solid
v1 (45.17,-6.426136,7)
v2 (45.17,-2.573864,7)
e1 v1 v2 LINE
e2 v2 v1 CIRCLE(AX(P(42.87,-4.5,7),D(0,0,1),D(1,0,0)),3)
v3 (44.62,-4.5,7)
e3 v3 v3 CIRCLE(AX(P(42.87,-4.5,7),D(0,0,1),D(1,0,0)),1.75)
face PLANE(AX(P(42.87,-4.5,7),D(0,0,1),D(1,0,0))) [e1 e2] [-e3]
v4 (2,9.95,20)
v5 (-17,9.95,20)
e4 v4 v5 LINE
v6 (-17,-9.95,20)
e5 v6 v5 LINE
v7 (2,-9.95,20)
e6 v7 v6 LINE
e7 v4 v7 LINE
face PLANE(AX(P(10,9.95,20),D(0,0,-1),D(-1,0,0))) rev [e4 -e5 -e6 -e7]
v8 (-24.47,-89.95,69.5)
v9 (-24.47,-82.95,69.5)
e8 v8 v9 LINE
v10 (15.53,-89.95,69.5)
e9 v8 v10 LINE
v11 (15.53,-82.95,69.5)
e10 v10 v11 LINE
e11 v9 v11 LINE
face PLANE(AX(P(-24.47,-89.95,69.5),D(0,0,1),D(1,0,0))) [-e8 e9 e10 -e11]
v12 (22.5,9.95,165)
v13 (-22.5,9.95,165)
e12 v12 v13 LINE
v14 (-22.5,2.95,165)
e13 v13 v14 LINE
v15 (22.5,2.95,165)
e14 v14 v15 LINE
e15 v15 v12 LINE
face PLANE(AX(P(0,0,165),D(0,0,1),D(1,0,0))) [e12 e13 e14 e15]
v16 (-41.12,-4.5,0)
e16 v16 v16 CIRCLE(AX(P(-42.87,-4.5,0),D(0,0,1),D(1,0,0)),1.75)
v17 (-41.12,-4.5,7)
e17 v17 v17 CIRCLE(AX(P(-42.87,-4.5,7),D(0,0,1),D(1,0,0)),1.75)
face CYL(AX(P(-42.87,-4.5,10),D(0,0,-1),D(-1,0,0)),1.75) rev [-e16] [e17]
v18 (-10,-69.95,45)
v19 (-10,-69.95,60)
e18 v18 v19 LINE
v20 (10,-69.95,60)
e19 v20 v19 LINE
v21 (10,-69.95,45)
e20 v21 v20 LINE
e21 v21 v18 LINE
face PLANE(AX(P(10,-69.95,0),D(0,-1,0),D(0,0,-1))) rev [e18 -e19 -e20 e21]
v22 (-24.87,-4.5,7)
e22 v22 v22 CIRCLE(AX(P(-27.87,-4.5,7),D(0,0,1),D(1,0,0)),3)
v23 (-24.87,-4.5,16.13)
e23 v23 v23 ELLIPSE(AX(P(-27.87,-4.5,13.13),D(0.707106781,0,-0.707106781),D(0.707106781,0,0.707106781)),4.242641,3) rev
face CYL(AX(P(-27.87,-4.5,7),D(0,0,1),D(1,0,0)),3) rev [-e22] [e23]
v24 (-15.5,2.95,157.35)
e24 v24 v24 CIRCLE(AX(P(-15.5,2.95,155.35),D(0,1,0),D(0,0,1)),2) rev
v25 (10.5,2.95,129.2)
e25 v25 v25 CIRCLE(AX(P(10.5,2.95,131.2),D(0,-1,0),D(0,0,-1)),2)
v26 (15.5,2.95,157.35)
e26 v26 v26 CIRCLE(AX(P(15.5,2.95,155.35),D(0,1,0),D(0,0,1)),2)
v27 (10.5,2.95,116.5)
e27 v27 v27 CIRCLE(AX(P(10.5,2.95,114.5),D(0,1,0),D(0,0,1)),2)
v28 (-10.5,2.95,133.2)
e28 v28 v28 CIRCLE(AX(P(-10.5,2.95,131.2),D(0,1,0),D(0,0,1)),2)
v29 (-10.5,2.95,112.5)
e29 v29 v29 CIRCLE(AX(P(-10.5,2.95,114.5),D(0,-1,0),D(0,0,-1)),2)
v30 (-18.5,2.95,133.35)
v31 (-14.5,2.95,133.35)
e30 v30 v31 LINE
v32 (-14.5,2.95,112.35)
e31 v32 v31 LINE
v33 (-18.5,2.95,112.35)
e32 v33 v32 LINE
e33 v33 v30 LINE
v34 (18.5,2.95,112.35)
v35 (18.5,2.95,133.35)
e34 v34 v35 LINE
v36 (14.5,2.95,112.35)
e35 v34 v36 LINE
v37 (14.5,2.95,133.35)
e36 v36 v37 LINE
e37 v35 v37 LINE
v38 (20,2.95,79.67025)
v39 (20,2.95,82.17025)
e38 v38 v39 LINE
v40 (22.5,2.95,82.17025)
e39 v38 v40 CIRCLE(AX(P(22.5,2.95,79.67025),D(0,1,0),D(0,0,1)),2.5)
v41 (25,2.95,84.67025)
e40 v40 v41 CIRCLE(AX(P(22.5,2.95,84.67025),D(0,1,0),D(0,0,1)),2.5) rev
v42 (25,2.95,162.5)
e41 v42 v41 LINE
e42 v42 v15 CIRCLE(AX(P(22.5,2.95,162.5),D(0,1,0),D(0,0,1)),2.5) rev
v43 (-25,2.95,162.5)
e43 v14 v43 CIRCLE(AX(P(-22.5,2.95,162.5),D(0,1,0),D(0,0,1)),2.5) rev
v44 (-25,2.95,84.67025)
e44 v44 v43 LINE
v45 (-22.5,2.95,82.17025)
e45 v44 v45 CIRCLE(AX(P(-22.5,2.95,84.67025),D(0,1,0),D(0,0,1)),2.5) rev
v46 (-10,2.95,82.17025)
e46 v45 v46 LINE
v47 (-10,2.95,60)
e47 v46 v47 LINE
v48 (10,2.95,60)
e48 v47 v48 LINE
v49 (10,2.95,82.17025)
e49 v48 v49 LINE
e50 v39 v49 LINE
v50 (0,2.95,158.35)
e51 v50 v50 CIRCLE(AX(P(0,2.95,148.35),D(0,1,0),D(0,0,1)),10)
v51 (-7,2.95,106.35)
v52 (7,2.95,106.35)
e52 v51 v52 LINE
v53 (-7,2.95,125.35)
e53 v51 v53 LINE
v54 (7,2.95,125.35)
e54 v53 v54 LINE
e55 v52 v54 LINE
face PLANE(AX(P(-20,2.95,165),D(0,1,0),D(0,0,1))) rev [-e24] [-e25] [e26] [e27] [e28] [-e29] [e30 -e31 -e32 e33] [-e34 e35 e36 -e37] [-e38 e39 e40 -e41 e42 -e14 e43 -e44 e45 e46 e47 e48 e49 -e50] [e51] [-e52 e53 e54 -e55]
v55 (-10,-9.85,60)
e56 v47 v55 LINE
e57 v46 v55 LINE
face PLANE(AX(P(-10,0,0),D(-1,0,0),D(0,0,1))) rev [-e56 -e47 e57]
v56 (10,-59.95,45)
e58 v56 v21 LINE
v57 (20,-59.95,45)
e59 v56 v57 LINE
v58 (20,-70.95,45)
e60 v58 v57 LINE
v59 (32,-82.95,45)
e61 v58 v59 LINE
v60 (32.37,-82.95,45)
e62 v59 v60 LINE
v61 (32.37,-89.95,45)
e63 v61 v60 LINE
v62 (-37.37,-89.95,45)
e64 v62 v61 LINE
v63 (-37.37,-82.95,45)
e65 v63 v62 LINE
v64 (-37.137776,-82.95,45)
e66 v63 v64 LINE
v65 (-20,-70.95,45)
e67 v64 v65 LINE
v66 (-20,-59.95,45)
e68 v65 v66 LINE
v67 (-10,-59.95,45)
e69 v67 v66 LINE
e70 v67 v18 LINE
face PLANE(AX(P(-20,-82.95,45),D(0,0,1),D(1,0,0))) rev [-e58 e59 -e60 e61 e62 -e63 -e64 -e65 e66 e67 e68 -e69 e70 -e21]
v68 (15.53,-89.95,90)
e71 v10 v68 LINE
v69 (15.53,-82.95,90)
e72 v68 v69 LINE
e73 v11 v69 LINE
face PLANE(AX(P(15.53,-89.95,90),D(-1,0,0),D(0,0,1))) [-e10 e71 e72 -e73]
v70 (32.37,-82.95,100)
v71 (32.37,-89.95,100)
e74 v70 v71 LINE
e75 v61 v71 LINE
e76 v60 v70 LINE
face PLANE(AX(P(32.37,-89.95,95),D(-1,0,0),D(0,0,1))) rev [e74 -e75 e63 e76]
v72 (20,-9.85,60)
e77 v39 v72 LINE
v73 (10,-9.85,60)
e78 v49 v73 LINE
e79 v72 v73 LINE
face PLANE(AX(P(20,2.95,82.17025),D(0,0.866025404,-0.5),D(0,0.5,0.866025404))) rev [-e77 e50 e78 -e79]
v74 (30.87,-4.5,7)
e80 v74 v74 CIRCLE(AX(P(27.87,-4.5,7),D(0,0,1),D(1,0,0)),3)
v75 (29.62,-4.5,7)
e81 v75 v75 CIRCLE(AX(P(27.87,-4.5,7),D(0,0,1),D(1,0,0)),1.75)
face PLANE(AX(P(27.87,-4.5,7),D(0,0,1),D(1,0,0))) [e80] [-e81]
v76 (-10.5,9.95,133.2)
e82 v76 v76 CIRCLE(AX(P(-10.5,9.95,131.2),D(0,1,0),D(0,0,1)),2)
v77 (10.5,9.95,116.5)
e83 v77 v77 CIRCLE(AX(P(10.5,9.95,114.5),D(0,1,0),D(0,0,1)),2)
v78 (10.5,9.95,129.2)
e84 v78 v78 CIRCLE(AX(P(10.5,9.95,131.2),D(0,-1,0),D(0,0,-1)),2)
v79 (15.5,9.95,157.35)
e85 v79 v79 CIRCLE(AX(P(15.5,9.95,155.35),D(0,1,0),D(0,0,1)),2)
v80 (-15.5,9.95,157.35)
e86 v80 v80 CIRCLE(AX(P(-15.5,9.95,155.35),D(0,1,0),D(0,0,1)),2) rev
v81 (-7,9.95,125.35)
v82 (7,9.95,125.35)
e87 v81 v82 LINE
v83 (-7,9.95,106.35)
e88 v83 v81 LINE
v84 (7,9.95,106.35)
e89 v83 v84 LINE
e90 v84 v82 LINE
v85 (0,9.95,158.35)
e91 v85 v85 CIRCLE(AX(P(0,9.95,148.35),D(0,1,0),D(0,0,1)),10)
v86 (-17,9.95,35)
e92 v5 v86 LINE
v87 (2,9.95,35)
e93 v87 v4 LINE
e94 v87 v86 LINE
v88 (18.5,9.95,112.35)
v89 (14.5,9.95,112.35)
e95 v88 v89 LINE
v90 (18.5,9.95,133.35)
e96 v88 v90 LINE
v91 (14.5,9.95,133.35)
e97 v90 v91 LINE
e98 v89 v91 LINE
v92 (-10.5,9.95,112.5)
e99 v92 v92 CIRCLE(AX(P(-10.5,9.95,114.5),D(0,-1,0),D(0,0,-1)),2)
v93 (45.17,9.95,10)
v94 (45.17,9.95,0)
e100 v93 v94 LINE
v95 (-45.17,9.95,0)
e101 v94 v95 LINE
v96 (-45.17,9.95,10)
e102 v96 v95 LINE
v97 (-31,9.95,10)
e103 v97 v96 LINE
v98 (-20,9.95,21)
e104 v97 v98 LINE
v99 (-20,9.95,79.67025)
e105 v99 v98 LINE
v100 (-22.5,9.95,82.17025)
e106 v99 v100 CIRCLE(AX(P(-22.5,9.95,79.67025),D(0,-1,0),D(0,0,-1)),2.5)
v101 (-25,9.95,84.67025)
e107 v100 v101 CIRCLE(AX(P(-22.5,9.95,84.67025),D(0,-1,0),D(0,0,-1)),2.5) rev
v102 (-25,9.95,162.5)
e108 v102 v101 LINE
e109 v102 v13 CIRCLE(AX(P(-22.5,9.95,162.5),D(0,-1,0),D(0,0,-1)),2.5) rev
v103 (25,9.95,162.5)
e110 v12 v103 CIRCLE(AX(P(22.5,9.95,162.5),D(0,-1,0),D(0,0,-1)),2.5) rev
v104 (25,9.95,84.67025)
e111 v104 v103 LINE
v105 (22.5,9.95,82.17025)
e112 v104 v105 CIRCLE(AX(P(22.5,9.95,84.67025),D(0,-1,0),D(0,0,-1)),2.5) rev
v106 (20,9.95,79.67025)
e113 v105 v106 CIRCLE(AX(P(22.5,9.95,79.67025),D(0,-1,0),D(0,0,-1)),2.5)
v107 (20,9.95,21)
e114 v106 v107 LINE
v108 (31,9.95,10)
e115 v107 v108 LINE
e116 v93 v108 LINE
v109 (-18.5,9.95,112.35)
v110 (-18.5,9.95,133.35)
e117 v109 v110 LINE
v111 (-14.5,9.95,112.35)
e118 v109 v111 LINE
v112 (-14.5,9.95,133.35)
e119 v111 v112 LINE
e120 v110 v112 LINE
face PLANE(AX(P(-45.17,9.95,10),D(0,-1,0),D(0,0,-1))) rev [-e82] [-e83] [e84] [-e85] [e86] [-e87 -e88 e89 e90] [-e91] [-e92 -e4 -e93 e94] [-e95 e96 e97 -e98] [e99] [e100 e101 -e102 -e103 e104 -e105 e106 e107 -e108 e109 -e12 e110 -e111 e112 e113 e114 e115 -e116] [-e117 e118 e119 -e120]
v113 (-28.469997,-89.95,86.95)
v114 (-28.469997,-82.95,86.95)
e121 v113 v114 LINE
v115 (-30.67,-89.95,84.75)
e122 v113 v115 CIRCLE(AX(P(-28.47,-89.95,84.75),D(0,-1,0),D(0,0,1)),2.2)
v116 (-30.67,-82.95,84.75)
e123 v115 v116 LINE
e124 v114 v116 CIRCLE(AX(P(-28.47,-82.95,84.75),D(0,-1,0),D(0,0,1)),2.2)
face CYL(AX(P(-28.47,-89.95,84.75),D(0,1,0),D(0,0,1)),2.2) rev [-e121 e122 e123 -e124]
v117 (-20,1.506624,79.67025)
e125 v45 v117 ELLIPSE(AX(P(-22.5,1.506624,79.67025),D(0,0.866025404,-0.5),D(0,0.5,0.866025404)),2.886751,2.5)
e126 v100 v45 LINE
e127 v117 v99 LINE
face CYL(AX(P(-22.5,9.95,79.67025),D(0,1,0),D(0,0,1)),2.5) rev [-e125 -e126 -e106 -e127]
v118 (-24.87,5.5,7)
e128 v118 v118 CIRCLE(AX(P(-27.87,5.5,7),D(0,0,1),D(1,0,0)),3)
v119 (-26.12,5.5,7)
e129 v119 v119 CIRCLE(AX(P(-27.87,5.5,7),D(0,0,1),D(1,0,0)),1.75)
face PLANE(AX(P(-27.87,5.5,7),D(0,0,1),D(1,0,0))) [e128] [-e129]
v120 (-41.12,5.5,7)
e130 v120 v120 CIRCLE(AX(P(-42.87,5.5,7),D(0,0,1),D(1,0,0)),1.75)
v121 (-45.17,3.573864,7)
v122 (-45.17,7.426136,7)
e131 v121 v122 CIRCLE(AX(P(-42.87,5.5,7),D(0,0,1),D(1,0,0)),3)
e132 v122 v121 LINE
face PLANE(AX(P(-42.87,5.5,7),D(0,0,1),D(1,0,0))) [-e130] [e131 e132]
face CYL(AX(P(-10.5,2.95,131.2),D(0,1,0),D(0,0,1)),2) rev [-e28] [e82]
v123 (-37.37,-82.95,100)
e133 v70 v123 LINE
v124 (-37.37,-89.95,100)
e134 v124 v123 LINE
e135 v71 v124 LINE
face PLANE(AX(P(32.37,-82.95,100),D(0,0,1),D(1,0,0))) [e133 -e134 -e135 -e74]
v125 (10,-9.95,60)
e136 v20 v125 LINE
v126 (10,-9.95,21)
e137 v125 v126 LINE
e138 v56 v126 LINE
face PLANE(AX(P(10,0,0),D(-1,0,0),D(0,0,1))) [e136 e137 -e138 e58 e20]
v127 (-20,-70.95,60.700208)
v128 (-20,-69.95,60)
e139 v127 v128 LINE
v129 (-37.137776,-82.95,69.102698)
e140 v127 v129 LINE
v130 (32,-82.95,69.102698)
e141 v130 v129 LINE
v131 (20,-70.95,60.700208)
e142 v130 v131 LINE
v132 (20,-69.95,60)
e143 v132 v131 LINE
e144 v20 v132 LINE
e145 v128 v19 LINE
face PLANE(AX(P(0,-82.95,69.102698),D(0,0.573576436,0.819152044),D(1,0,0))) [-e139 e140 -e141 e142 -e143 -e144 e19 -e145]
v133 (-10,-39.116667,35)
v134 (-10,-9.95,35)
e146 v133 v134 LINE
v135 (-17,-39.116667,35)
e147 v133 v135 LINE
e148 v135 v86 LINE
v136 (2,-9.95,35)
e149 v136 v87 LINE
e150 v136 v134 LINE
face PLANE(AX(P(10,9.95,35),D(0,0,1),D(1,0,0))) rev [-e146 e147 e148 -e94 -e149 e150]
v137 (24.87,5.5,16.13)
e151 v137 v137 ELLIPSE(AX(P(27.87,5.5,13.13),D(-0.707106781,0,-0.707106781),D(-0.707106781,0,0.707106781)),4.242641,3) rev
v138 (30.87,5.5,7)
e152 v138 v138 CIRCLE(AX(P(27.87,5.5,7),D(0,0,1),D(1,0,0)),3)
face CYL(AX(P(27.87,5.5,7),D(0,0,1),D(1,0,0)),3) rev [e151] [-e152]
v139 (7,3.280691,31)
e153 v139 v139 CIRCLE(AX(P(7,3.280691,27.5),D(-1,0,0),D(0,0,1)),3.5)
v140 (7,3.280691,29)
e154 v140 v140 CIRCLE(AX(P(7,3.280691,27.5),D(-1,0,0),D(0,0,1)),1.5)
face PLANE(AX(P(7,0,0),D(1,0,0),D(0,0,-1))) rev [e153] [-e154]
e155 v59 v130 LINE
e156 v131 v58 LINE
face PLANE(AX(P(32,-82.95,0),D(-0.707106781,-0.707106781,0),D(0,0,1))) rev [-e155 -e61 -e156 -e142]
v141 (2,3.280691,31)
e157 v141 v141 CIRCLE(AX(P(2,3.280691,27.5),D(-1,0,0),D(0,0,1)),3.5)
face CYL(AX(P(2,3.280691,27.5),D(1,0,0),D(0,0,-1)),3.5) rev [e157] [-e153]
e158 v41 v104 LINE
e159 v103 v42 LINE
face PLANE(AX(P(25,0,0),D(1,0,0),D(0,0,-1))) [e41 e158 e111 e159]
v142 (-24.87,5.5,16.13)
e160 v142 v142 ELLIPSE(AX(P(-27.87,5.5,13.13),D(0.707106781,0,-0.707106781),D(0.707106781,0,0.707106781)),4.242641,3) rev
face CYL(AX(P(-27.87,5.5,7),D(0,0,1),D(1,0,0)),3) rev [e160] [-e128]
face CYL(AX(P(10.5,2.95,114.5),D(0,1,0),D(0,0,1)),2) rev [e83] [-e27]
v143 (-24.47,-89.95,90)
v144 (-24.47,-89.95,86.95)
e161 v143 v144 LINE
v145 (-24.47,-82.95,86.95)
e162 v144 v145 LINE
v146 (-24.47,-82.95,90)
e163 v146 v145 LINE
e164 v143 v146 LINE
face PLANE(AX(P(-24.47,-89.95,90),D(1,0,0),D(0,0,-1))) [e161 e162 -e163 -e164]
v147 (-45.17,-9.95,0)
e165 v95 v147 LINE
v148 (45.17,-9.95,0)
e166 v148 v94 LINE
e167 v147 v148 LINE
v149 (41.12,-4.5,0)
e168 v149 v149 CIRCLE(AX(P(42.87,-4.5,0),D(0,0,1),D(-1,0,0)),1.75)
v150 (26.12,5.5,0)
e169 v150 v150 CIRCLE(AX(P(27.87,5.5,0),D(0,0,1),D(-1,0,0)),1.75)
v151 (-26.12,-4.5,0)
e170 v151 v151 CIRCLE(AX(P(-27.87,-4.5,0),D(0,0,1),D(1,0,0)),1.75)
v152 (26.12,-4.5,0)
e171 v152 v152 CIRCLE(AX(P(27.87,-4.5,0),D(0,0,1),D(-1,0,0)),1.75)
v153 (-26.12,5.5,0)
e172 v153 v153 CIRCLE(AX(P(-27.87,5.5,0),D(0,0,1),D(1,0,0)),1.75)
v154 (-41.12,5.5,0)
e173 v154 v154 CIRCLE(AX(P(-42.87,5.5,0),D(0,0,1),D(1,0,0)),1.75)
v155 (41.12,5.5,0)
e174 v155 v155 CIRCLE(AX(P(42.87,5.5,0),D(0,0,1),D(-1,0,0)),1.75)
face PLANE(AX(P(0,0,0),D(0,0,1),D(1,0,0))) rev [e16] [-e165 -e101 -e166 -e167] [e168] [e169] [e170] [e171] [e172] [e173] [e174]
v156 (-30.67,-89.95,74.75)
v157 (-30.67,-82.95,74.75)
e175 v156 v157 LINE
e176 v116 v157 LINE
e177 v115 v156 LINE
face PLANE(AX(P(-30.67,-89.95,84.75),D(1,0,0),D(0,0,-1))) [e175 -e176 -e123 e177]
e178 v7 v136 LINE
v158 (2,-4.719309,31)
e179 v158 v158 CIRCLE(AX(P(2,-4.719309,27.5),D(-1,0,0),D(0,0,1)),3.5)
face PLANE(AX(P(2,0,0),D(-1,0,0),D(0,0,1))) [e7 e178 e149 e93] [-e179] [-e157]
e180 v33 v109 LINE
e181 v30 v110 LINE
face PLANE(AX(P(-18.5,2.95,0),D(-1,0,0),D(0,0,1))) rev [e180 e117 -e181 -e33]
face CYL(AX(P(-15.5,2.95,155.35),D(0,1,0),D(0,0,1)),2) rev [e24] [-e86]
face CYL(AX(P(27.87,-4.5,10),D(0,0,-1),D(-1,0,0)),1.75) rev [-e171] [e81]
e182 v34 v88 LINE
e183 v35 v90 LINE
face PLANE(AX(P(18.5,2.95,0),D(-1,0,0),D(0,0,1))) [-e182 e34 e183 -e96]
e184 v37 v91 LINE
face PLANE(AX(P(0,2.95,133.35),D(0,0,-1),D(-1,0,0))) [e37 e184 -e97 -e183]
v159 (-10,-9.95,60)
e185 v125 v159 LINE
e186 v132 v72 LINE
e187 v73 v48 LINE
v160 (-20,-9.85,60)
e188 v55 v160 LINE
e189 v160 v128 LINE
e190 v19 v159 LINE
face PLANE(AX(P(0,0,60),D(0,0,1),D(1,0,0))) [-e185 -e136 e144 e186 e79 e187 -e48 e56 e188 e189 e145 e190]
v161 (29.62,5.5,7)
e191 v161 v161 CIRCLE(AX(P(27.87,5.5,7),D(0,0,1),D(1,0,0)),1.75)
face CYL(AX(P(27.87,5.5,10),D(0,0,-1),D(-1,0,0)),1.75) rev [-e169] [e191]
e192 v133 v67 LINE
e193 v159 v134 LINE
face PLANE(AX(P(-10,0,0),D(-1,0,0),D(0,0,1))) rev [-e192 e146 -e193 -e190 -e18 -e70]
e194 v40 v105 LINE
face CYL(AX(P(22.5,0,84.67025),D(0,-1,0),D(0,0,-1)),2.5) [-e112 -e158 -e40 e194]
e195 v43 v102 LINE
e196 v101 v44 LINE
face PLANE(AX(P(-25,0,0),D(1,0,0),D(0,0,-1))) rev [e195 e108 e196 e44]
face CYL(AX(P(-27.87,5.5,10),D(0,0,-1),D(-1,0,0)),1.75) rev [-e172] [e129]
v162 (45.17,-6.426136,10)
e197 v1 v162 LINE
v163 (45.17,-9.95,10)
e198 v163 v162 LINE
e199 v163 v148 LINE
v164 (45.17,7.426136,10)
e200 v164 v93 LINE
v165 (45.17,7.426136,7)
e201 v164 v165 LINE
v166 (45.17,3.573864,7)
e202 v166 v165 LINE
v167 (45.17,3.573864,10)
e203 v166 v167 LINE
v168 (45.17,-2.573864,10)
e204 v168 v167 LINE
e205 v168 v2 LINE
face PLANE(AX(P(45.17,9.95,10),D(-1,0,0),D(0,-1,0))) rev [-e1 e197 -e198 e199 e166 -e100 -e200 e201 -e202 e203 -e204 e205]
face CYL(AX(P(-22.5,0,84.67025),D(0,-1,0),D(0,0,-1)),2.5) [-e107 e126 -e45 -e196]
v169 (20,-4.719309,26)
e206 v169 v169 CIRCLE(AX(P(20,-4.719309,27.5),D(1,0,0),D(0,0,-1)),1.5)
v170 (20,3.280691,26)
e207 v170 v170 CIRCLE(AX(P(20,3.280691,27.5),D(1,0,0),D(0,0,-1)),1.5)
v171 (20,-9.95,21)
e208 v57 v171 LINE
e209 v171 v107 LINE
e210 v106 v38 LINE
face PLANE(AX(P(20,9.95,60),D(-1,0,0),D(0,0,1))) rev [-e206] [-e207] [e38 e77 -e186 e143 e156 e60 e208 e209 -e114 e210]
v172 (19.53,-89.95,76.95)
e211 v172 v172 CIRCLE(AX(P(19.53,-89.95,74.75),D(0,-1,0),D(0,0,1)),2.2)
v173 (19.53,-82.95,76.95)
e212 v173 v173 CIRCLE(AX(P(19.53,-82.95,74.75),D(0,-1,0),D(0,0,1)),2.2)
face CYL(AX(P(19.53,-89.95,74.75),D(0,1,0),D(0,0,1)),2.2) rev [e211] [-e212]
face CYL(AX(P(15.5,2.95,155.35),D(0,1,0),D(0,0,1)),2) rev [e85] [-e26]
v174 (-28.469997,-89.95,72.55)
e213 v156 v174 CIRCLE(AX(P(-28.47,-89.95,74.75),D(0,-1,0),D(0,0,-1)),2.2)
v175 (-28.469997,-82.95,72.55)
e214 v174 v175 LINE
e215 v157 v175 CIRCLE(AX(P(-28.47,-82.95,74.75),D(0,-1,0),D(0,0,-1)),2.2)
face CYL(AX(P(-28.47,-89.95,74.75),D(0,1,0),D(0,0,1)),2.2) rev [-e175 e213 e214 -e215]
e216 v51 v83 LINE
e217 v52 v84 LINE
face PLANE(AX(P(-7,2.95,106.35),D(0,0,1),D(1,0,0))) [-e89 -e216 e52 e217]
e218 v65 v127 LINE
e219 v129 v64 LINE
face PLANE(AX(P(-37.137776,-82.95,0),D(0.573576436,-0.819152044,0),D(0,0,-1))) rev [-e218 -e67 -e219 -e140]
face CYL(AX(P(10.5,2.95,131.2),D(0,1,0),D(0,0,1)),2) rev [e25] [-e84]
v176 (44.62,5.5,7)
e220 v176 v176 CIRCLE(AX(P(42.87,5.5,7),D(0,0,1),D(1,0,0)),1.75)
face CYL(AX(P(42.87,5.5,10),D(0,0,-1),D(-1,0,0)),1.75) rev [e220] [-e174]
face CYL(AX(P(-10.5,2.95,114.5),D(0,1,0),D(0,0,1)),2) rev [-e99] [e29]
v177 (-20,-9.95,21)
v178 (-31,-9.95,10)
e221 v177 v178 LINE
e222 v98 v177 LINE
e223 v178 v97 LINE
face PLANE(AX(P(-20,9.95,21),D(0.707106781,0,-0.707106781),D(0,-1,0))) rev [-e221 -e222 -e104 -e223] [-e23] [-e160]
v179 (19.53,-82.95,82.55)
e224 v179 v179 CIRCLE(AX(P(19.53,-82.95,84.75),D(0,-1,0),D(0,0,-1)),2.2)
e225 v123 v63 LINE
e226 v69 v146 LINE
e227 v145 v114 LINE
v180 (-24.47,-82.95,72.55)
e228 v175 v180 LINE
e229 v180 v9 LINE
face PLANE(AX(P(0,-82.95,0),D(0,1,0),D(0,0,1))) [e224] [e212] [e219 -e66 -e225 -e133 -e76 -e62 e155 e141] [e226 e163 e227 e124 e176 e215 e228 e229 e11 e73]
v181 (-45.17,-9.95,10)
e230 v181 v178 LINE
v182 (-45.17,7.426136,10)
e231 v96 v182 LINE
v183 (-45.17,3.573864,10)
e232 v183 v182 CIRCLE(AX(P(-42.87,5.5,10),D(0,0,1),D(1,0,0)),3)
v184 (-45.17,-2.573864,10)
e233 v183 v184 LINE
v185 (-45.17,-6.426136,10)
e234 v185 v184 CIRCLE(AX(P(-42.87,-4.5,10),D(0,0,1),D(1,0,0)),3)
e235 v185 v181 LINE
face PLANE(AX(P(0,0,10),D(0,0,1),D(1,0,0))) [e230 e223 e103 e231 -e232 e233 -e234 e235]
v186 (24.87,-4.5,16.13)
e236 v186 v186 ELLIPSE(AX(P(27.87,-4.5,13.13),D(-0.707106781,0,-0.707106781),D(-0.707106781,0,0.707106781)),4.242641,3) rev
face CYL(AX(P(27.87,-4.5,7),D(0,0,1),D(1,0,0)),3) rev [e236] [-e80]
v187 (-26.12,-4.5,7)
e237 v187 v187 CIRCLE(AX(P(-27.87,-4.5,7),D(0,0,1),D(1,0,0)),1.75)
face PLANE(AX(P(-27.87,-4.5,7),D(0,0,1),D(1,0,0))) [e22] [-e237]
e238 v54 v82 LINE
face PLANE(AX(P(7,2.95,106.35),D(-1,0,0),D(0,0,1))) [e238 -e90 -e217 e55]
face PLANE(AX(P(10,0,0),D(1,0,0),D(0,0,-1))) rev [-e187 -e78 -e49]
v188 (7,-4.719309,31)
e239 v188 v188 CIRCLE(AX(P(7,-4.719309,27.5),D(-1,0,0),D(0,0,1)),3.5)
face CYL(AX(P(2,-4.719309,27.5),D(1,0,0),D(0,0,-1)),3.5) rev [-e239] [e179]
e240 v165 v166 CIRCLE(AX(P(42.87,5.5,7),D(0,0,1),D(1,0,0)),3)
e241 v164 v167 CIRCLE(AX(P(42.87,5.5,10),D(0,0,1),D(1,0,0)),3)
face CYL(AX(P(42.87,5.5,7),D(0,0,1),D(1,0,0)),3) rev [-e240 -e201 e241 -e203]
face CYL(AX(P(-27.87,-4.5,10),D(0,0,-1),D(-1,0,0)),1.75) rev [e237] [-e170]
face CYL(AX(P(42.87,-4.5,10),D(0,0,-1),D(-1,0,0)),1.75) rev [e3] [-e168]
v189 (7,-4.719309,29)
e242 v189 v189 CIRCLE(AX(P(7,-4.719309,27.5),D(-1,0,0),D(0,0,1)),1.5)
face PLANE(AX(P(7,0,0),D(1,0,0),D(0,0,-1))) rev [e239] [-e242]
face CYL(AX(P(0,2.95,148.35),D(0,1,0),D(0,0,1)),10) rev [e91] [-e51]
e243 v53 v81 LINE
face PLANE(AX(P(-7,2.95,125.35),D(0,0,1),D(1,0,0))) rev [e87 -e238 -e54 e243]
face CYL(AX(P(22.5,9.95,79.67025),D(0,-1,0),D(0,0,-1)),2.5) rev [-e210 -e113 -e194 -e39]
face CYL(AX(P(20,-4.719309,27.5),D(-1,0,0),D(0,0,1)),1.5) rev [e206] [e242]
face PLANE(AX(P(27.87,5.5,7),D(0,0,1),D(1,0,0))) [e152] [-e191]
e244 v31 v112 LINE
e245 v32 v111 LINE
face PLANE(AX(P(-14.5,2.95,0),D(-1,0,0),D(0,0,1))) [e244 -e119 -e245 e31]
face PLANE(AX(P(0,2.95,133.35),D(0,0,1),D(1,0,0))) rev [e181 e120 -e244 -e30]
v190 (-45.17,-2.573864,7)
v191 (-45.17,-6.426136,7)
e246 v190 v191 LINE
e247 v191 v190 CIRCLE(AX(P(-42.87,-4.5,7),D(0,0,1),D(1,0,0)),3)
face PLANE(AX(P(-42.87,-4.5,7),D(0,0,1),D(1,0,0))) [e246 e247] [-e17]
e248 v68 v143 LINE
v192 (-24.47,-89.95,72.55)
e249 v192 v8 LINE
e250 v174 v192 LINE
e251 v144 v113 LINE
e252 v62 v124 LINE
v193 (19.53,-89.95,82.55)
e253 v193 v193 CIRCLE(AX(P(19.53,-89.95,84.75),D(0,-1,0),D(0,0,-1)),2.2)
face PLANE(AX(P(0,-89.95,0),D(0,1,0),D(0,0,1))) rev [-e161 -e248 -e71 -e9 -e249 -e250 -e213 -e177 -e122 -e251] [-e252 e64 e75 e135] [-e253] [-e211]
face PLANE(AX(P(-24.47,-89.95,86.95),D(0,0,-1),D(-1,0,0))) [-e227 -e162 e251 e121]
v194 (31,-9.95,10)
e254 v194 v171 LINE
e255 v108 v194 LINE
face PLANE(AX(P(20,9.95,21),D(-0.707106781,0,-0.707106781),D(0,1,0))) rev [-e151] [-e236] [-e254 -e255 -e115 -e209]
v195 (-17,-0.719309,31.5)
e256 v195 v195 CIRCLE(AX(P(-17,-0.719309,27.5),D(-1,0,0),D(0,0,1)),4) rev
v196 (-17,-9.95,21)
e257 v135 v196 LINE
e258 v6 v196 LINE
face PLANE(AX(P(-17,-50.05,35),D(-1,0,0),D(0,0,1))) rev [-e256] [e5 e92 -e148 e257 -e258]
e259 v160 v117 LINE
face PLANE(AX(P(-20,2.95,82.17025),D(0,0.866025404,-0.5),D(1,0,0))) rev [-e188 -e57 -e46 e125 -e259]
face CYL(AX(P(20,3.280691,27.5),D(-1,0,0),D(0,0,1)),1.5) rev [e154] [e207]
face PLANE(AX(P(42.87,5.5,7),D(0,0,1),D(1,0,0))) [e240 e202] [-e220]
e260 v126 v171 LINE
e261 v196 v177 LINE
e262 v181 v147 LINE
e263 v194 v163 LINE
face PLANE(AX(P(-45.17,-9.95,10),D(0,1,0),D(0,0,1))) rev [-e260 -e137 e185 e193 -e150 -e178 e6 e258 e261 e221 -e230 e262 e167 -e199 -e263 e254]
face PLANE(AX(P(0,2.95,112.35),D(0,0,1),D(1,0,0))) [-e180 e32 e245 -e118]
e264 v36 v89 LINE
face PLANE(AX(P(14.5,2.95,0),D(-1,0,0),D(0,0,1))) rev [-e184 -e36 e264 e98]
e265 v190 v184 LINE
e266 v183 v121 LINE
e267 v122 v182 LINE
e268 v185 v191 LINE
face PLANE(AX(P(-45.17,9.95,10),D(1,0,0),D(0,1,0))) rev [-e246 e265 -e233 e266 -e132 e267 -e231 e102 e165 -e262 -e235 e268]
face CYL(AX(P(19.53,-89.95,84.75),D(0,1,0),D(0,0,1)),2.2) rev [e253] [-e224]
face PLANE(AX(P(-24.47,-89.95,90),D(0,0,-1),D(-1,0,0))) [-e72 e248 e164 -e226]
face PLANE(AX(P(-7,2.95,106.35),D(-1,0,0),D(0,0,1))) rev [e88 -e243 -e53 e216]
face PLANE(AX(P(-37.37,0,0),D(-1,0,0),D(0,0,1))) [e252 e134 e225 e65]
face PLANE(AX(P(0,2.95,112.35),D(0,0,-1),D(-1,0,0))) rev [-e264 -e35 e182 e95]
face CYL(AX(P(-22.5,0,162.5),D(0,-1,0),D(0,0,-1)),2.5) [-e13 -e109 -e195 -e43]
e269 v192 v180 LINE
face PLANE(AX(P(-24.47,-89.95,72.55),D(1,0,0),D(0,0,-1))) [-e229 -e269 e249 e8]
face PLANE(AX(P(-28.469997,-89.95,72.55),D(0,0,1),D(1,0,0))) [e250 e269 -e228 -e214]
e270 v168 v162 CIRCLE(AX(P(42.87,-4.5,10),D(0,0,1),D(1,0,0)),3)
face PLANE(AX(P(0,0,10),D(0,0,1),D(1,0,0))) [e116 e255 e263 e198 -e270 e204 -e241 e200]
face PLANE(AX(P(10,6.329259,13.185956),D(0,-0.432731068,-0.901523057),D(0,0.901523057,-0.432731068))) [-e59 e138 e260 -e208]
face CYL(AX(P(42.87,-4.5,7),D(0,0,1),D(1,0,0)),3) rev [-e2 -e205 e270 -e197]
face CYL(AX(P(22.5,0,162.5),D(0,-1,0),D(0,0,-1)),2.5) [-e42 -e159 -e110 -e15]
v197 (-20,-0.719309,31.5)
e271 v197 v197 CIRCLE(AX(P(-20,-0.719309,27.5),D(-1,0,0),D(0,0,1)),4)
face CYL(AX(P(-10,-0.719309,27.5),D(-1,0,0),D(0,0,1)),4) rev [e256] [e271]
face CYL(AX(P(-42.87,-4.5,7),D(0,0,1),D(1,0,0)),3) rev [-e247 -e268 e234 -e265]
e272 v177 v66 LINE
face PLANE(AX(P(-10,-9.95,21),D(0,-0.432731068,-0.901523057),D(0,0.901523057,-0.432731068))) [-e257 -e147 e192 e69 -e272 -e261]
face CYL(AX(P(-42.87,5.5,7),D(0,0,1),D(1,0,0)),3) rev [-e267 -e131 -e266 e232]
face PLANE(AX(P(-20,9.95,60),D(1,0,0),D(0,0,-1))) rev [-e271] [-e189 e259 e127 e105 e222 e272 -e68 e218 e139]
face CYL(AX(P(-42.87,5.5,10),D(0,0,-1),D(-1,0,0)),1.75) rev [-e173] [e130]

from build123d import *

# Parameters (mm, degrees)
SKETCH_1_W           = 90.34
SKETCH_1_H           = 19.9
SKETCH_1_R           = 1.75
EXTRUDE_1_DEPTH      = 10
SKETCH_2_W           = 40
SKETCH_2_H           = 19.9
EXTRUDE_2_DEPTH      = 50
SKETCH_3_W           = 40
SKETCH_3_H           = 15
EXTRUDE_3_DEPTH      = 73
SKETCH_4_R           = 2.2
EXTRUDE_4_DEPTH      = 7
SKETCH_15_R          = 3
CUT_EXTRUDE_5_DEPTH  = 3
CUT_EXTRUDE_START    = -10
SKETCH_16_W          = 15
SKETCH_16_H          = 60
CUT_EXTRUDE_6_DEPTH  = 20
CHAMFER_3_SIZE       = 9.102697997
CHAMFER_3_SIZE_2     = 13
CHAMFER_1_SIZE       = 11
SKETCH_22_W          = 40
SKETCH_22_H          = 7
EXTRUDE_7_DEPTH      = 105
SKETCH_23_R          = 2
SKETCH_23_R_2        = 10
SKETCH_23_W          = 4
SKETCH_23_H          = 21
SKETCH_23_W_2        = 14
SKETCH_23_H_2        = 19
CUT_EXTRUDE_9_DEPTH  = 7
CHAMFER_4_SIZE       = 12.8
CHAMFER_4_SIZE2      = 22.170250337
SKETCH_25_W          = 82.829749663
SKETCH_25_H          = 7
EXTRUDE_8_DEPTH      = 5
SKETCH_26_W          = 82.829749663
SKETCH_26_H          = 7
EXTRUDE_9_DEPTH      = 5
SKETCH_28_W          = 64.74
SKETCH_28_H          = 5
EXTRUDE_10_DEPTH     = 7
SKETCH_31_W          = 25
SKETCH_31_H          = 19.9
SKETCH_31_W_2        = 10
EXTRUDE_12_DEPTH     = 20
SKETCH_33_R          = 4
CUT_EXTRUDE_11_DEPTH = 10
SKETCH_32_R          = 1.5
CUT_EXTRUDE_12_DEPTH = 30
EXTRUDE_13_DEPTH     = 10
EXTRUDE_14_DEPTH     = 10
FILLET_2_R           = 2.5
FILLET_3_R           = 2.5
EXTRUDE_START        = 20
EXTRUDE_15_DEPTH     = 10
SKETCH_38_W          = 55
SKETCH_38_H          = 7
EXTRUDE_16_DEPTH     = 5
CHAMFER_5_SIZE       = 12
CHAMFER_5_SIZE2      = 17.137776081
CHAMFER_6_SIZE       = 12
EXTRUDE_START_2      = 3
SKETCH_39_W          = 15
SKETCH_39_H          = 19.9
SKETCH_39_R          = 1.5
EXTRUDE_17_DEPTH     = 3
SKETCH_40_W          = 15
SKETCH_40_H          = 19.9
SKETCH_40_R          = 4
EXTRUDE_18_DEPTH     = 3
SKETCH_41_W          = 10
SKETCH_41_H          = 15
CUT_EXTRUDE_13_DEPTH = 60
SKETCH_42_W          = 15
SKETCH_42_H          = 19.9
SKETCH_42_R          = 3.5
EXTRUDE_20_DEPTH     = 5


# Some blends are built 0.0001 mm under size
with BuildPart() as part:
    # 草图1 → 凸台-拉伸1 (new body)
    with BuildSketch(Plane.XY):
        Rectangle(SKETCH_1_W, SKETCH_1_H)
        with Locations((-42.87, 5.5)):
            Circle(SKETCH_1_R, mode=Mode.SUBTRACT)
        with Locations((-42.87, -4.5)):
            Circle(SKETCH_1_R, mode=Mode.SUBTRACT)
        with Locations((-27.87, 5.5)):
            Circle(SKETCH_1_R, mode=Mode.SUBTRACT)
        with Locations((-27.87, -4.5)):
            Circle(SKETCH_1_R, mode=Mode.SUBTRACT)
        with Locations(Location((27.87, -4.5, 0), (0, 0, 180))):
            Circle(SKETCH_1_R, mode=Mode.SUBTRACT)
        with Locations(Location((27.87, 5.5, 0), (0, 0, 180))):
            Circle(SKETCH_1_R, mode=Mode.SUBTRACT)
        with Locations(Location((42.87, -4.5, 0), (0, 0, 180))):
            Circle(SKETCH_1_R, mode=Mode.SUBTRACT)
        with Locations(Location((42.87, 5.5, 0), (0, 0, 180))):
            Circle(SKETCH_1_R, mode=Mode.SUBTRACT)
    extrude(amount=EXTRUDE_1_DEPTH)

    # 草图2 → 凸台-拉伸2 (add)
    with BuildSketch(Plane.XY.offset(10)):
        Rectangle(SKETCH_2_W, SKETCH_2_H)
    extrude(amount=EXTRUDE_2_DEPTH)

    # 草图3 → 凸台-拉伸3 (add)
    with BuildSketch(Plane.XZ.offset(9.95)):
        with Locations((0, 52.5)):
            Rectangle(SKETCH_3_W, SKETCH_3_H)
    extrude(amount=EXTRUDE_3_DEPTH)

    # 草图4 → 凸台-拉伸4 (add)
    with BuildSketch(Plane.XZ.offset(82.95)):
        Polygon((-32.37, 95), (32.37, 95), (32.37, 60), (32.37, 45), (-32.37, 45), (-32.37, 60), align=None)
        with Locations(Location((19.53, 84.75, 0), (0, 0, 270))):
            Circle(SKETCH_4_R, mode=Mode.SUBTRACT)
        with Locations(Location((19.53, 74.75, 0), (0, 0, 90))):
            Circle(SKETCH_4_R, mode=Mode.SUBTRACT)
        with BuildLine():
            Line((-24.47, 90), (15.53, 90))
            Line((15.53, 90), (15.53, 69.5))
            Line((15.53, 69.5), (-24.47, 69.5))
            Line((-24.47, 69.5), (-24.47, 72.55))
            Line((-24.47, 72.55), (-28.469997184, 72.55))
            ThreePointArc((-28.469997184, 72.55), (-30.025633923, 73.194364086), (-30.67, 74.75))
            Line((-30.67, 74.75), (-30.67, 84.75))
            ThreePointArc((-30.67, 84.75), (-30.025633923, 86.305635914), (-28.469997184, 86.95))
            Line((-28.469997184, 86.95), (-24.47, 86.95))
            Line((-24.47, 86.95), (-24.47, 90))
        make_face(mode=Mode.SUBTRACT)
    extrude(amount=EXTRUDE_4_DEPTH)

    # 草图15 → 切除-拉伸5 (cut)
    with BuildSketch(Plane.XY.offset(10)):
        with Locations((-42.87, 5.5)):
            Circle(SKETCH_15_R)
        with Locations((-42.87, -4.5)):
            Circle(SKETCH_15_R)
        with Locations((-27.87, 5.5)):
            Circle(SKETCH_15_R)
        with Locations((-27.87, -4.5)):
            Circle(SKETCH_15_R)
        with Locations((27.87, 5.5)):
            Circle(SKETCH_15_R)
        with Locations((27.87, -4.5)):
            Circle(SKETCH_15_R)
        with Locations((42.87, 5.5)):
            Circle(SKETCH_15_R)
        with Locations((42.87, -4.5)):
            Circle(SKETCH_15_R)
    extrude(amount=-CUT_EXTRUDE_5_DEPTH, mode=Mode.SUBTRACT)

    # 草图16 → 切除-拉伸6 (cut)
    with BuildSketch(Plane.ZY.offset(20).offset(CUT_EXTRUDE_START)):
        Polygon((10, -9.95), (45, -9.95), (60, -9.95), (60, 9.95), (10, 9.95), align=None)
        with Locations((52.5, -39.95)):
            Rectangle(SKETCH_16_W, SKETCH_16_H)
    extrude(amount=-CUT_EXTRUDE_6_DEPTH, mode=Mode.SUBTRACT)

    # 倒角3
    # the kernel refuses this chamfer: 13, 9.102697997 mm, written as the material it adds along each edge
    with BuildSketch(Plane(origin=(-20, -82.95, 60), x_dir=(0, -0.045263737714020945, 0.9989750717851553), z_dir=(1, 0, 0))) as chamfer_3_piece_1:
        Polygon((CHAMFER_3_SIZE * 0.998975071755, -CHAMFER_3_SIZE * 0.0452637377127), (-CHAMFER_3_SIZE_2 * 0.045263737714, -CHAMFER_3_SIZE_2 * 0.998975071785), (0, 0), align=None)
    extrude(amount=40)

    # 倒角1
    # the kernel refuses this chamfer: 11 mm, written as the material it adds along each edge
    with BuildSketch(Plane(origin=(20, 9.95, 10), x_dir=(-0.027495876610586587, 0, 0.9996219169112966), z_dir=(0, -1, 0))) as chamfer_1_piece_1_section:
        Polygon((CHAMFER_1_SIZE * 0.999621916911, -CHAMFER_1_SIZE * 0.0274958766106), (-CHAMFER_1_SIZE * 0.0274958766106, -CHAMFER_1_SIZE * 0.999621916911), (0, 0), align=None)
    chamfer_1_piece_1 = extrude(amount=19.9, mode=Mode.PRIVATE)
    chamfer_1_piece_1 = chamfer_1_piece_1 - Plane(origin=(27.87, 5.5, 13.954433194), x_dir=(1, 0, 0), z_dir=(0, 0, 1)) * Cylinder(3, 84, mode=Mode.PRIVATE)
    chamfer_1_piece_1 = chamfer_1_piece_1 - Plane(origin=(27.87, -4.5, 13.954433194), x_dir=(1, 0, 0), z_dir=(0, 0, 1)) * Cylinder(3, 84, mode=Mode.PRIVATE)
    add(chamfer_1_piece_1)
    with BuildSketch(Plane(origin=(-20, -9.95, 10), x_dir=(-0.9996219169112968, 0, -0.027495876610586417), z_dir=(0, 1, 0))) as chamfer_1_piece_2_section:
        Polygon((CHAMFER_1_SIZE * 0.999621916911, CHAMFER_1_SIZE * 0.0274958766106), (-CHAMFER_1_SIZE * 0.0274958766106, CHAMFER_1_SIZE * 0.999621916911), (0, 0), align=None)
    chamfer_1_piece_2 = extrude(amount=19.9, mode=Mode.PRIVATE)
    chamfer_1_piece_2 = chamfer_1_piece_2 - Plane(origin=(-27.87, -4.5, 13.954436556), x_dir=(1, 0, 0), z_dir=(0, 0, 1)) * Cylinder(3, 84, mode=Mode.PRIVATE)
    chamfer_1_piece_2 = chamfer_1_piece_2 - Plane(origin=(-27.87, 5.5, 13.954436556), x_dir=(1, 0, 0), z_dir=(0, 0, 1)) * Cylinder(3, 84, mode=Mode.PRIVATE)
    add(chamfer_1_piece_2)

    # 草图22 → 凸台-拉伸7 (add)
    with BuildSketch(Plane.XY.offset(60)):
        with Locations((0, 6.45)):
            Rectangle(SKETCH_22_W, SKETCH_22_H)
    extrude(amount=EXTRUDE_7_DEPTH)

    # 草图23 → 切除-拉伸9 (cut)
    with BuildSketch(Plane(origin=(0, 9.95, 0), x_dir=(1, 0, 0), z_dir=(0, 1, 0))):
        with Locations(Location((15.5, -155.35, 0), (0, 0, 270))):
            Circle(SKETCH_23_R)
        with Locations(Location((-15.5, -155.35, 0), (0, 0, 270))):
            Circle(SKETCH_23_R)
        with Locations(Location((10.5, -114.5, 0), (0, 0, 270))):
            Circle(SKETCH_23_R)
        with Locations(Location((-10.5, -114.5, 0), (0, 0, 90))):
            Circle(SKETCH_23_R)
        with Locations(Location((-10.5, -131.2, 0), (0, 0, 270))):
            Circle(SKETCH_23_R)
        with Locations(Location((10.5, -131.2, 0), (0, 0, 90))):
            Circle(SKETCH_23_R)
        with Locations(Location((0, -148.35, 0), (0, 0, 270))):
            Circle(SKETCH_23_R_2)
        with Locations((16.5, -122.85)):
            Rectangle(SKETCH_23_W, SKETCH_23_H)
        with Locations((-16.5, -122.85)):
            Rectangle(SKETCH_23_W, SKETCH_23_H)
        with Locations((0, -115.85)):
            Rectangle(SKETCH_23_W_2, SKETCH_23_H_2)
    extrude(amount=-CUT_EXTRUDE_9_DEPTH, mode=Mode.SUBTRACT)

    # 倒角4
    chamfer_4_edges = [part.edges().sort_by_distance(p)[0] for p in [
        (-15, 2.95, 60),
    ]]
    chamfer_4_side = [part.faces().sort_by_distance(p)[0] for p in [
        (-15, -33.5, 60),
    ]]
    chamfer(chamfer_4_edges, length=CHAMFER_4_SIZE, length2=CHAMFER_4_SIZE2, reference=chamfer_4_side[0])

    # 草图25 → 凸台-拉伸8 (add)
    with BuildSketch(Plane(origin=(20, 0, 0), x_dir=(0, 0, -1), z_dir=(1, 0, 0))):
        with Locations((-123.585125168, 6.45)):
            Rectangle(SKETCH_25_W, SKETCH_25_H)
    extrude(amount=EXTRUDE_8_DEPTH)

    # 草图26 → 凸台-拉伸9 (add)
    with BuildSketch(Plane.ZY.offset(20)):
        with Locations((123.585125168, 6.45)):
            Rectangle(SKETCH_26_W, SKETCH_26_H)
    extrude(amount=EXTRUDE_9_DEPTH)

    # 草图28 → 凸台-拉伸10 (add)
    with BuildSketch(Plane.XZ.offset(89.95)):
        with Locations((0, 97.5)):
            Rectangle(SKETCH_28_W, SKETCH_28_H)
    extrude(amount=-EXTRUDE_10_DEPTH)

    # 草图31 → 凸台-拉伸12 (add)
    with BuildSketch(Plane(origin=(-10, 0, 0), x_dir=(0, 0, -1), z_dir=(1, 0, 0))):
        with Locations((-47.5, 0)):
            Rectangle(SKETCH_31_W, SKETCH_31_H)
        with Locations((-15, 0)):
            Rectangle(SKETCH_31_W_2, SKETCH_31_H)
    extrude(amount=EXTRUDE_12_DEPTH)

    # 草图33 → 切除-拉伸11 (cut)
    with BuildSketch(Plane.ZY.offset(20)):
        with Locations((27.5, -0.719309013)):
            Circle(SKETCH_33_R)
    extrude(amount=-CUT_EXTRUDE_11_DEPTH, mode=Mode.SUBTRACT)

    # 草图32 → 切除-拉伸12 (cut)
    with BuildSketch(Plane(origin=(-10, 0, 0), x_dir=(0, 0, -1), z_dir=(1, 0, 0))):
        with Locations(Location((-27.5, 3.280690987, 0), (0, 0, 180))):
            Circle(SKETCH_32_R)
        with Locations(Location((-27.5, -4.719309013, 0), (0, 0, 180))):
            Circle(SKETCH_32_R)
    extrude(amount=CUT_EXTRUDE_12_DEPTH, mode=Mode.SUBTRACT)

    # 草图35 → 凸台-拉伸13 (add)
    with BuildSketch(Plane.ZY.offset(20)):
        Polygon((21, -9.95), (45, -59.95), (45, -9.95), align=None)
    extrude(amount=-EXTRUDE_13_DEPTH)

    # 草图36 → 凸台-拉伸14 (add)
    with BuildSketch(Plane(origin=(20, 0, 0), x_dir=(0, 0, -1), z_dir=(1, 0, 0))):
        Polygon((-45, -59.95), (-21, -9.95), (-35, -9.95), (-45, -9.95), align=None)
    extrude(amount=-EXTRUDE_14_DEPTH)

    # 圆角2
    fillet_2_edges = [part.edges().sort_by_distance(p)[0] for p in [
        (-25, 6.45, 82.170250337),
        (25, 6.45, 82.170250337),
        (20, 6.45, 82.170250337),
        (-20, 6.45, 82.170250337),
    ]]
    fillet(fillet_2_edges, radius=FILLET_2_R - 0.0001)  # a hair under: the kernel refuses the full size

    # 圆角3
    fillet_3_edges = [part.edges().sort_by_distance(p)[0] for p in [
        (25, 6.45, 165),
        (-25, 6.45, 165),
    ]]
    fillet(fillet_3_edges, radius=FILLET_3_R)

    # 草图37 → 凸台-拉伸15 (add)
    with BuildSketch(Plane(origin=(-10, 0, 0), x_dir=(0, 0, -1), z_dir=(1, 0, 0)).offset(EXTRUDE_START)):
        Polygon((-60, -9.85), (-60, 2.95), (-82.170250337, 2.95), align=None)
    extrude(amount=EXTRUDE_15_DEPTH)

    # 草图38 → 凸台-拉伸16 (add)
    with BuildSketch(Plane.ZY.offset(32.37)):
        with Locations((72.5, -86.45)):
            Rectangle(SKETCH_38_W, SKETCH_38_H)
    extrude(amount=EXTRUDE_16_DEPTH)

    # 倒角5
    chamfer_5_edges = [part.edges().sort_by_distance(p)[0] for p in [
        (-20, -82.95, 57.051348998),
    ]]
    chamfer_5_side = [part.faces().sort_by_distance(p)[0] for p in [
        (-20, -25.655166951, 48.045646106),
    ]]
    chamfer(chamfer_5_edges, length=CHAMFER_5_SIZE, length2=CHAMFER_5_SIZE2, reference=chamfer_5_side[0])

    # 倒角6
    chamfer_6_edges = [part.edges().sort_by_distance(p)[0] for p in [
        (20, -82.95, 57.051348998),
    ]]
    chamfer(chamfer_6_edges, length=CHAMFER_6_SIZE)

    # 草图39 → 凸台-拉伸17 (add)
    with BuildSketch(Plane.ZY.offset(-10).offset(EXTRUDE_START_2)):
        with Locations((27.5, 0)):
            Rectangle(SKETCH_39_W, SKETCH_39_H)
        with Locations((27.5, 3.280690987)):
            Circle(SKETCH_39_R, mode=Mode.SUBTRACT)
        with Locations((27.5, -4.719309013)):
            Circle(SKETCH_39_R, mode=Mode.SUBTRACT)
    extrude(amount=-EXTRUDE_17_DEPTH)

    # 草图40 → 凸台-拉伸18 (add)
    with BuildSketch(Plane(origin=(-10, 0, 0), x_dir=(0, 0, -1), z_dir=(1, 0, 0))):
        with Locations((-27.5, 0)):
            Rectangle(SKETCH_40_W, SKETCH_40_H)
        with Locations(Location((-27.5, -0.719309013, 0), (0, 0, 180))):
            Circle(SKETCH_40_R, mode=Mode.SUBTRACT)
    extrude(amount=EXTRUDE_18_DEPTH)

    # 草图41 → 切除-拉伸13 (cut)
    with BuildSketch(Plane(origin=(0, 9.95, 0), x_dir=(1, 0, 0), z_dir=(0, 1, 0))):
        with Locations((-12, -27.5)):
            Rectangle(SKETCH_41_W, SKETCH_41_H)
    extrude(amount=-CUT_EXTRUDE_13_DEPTH, mode=Mode.SUBTRACT)

    # 草图42 → 凸台-拉伸20 (add)
    with BuildSketch(Plane.ZY.offset(-7)):
        with Locations((27.5, 0)):
            Rectangle(SKETCH_42_W, SKETCH_42_H)
        with Locations((27.5, 3.280690987)):
            Circle(SKETCH_42_R, mode=Mode.SUBTRACT)
        with Locations((27.5, -4.719309013)):
            Circle(SKETCH_42_R, mode=Mode.SUBTRACT)
    extrude(amount=EXTRUDE_20_DEPTH)


solid = part.part
